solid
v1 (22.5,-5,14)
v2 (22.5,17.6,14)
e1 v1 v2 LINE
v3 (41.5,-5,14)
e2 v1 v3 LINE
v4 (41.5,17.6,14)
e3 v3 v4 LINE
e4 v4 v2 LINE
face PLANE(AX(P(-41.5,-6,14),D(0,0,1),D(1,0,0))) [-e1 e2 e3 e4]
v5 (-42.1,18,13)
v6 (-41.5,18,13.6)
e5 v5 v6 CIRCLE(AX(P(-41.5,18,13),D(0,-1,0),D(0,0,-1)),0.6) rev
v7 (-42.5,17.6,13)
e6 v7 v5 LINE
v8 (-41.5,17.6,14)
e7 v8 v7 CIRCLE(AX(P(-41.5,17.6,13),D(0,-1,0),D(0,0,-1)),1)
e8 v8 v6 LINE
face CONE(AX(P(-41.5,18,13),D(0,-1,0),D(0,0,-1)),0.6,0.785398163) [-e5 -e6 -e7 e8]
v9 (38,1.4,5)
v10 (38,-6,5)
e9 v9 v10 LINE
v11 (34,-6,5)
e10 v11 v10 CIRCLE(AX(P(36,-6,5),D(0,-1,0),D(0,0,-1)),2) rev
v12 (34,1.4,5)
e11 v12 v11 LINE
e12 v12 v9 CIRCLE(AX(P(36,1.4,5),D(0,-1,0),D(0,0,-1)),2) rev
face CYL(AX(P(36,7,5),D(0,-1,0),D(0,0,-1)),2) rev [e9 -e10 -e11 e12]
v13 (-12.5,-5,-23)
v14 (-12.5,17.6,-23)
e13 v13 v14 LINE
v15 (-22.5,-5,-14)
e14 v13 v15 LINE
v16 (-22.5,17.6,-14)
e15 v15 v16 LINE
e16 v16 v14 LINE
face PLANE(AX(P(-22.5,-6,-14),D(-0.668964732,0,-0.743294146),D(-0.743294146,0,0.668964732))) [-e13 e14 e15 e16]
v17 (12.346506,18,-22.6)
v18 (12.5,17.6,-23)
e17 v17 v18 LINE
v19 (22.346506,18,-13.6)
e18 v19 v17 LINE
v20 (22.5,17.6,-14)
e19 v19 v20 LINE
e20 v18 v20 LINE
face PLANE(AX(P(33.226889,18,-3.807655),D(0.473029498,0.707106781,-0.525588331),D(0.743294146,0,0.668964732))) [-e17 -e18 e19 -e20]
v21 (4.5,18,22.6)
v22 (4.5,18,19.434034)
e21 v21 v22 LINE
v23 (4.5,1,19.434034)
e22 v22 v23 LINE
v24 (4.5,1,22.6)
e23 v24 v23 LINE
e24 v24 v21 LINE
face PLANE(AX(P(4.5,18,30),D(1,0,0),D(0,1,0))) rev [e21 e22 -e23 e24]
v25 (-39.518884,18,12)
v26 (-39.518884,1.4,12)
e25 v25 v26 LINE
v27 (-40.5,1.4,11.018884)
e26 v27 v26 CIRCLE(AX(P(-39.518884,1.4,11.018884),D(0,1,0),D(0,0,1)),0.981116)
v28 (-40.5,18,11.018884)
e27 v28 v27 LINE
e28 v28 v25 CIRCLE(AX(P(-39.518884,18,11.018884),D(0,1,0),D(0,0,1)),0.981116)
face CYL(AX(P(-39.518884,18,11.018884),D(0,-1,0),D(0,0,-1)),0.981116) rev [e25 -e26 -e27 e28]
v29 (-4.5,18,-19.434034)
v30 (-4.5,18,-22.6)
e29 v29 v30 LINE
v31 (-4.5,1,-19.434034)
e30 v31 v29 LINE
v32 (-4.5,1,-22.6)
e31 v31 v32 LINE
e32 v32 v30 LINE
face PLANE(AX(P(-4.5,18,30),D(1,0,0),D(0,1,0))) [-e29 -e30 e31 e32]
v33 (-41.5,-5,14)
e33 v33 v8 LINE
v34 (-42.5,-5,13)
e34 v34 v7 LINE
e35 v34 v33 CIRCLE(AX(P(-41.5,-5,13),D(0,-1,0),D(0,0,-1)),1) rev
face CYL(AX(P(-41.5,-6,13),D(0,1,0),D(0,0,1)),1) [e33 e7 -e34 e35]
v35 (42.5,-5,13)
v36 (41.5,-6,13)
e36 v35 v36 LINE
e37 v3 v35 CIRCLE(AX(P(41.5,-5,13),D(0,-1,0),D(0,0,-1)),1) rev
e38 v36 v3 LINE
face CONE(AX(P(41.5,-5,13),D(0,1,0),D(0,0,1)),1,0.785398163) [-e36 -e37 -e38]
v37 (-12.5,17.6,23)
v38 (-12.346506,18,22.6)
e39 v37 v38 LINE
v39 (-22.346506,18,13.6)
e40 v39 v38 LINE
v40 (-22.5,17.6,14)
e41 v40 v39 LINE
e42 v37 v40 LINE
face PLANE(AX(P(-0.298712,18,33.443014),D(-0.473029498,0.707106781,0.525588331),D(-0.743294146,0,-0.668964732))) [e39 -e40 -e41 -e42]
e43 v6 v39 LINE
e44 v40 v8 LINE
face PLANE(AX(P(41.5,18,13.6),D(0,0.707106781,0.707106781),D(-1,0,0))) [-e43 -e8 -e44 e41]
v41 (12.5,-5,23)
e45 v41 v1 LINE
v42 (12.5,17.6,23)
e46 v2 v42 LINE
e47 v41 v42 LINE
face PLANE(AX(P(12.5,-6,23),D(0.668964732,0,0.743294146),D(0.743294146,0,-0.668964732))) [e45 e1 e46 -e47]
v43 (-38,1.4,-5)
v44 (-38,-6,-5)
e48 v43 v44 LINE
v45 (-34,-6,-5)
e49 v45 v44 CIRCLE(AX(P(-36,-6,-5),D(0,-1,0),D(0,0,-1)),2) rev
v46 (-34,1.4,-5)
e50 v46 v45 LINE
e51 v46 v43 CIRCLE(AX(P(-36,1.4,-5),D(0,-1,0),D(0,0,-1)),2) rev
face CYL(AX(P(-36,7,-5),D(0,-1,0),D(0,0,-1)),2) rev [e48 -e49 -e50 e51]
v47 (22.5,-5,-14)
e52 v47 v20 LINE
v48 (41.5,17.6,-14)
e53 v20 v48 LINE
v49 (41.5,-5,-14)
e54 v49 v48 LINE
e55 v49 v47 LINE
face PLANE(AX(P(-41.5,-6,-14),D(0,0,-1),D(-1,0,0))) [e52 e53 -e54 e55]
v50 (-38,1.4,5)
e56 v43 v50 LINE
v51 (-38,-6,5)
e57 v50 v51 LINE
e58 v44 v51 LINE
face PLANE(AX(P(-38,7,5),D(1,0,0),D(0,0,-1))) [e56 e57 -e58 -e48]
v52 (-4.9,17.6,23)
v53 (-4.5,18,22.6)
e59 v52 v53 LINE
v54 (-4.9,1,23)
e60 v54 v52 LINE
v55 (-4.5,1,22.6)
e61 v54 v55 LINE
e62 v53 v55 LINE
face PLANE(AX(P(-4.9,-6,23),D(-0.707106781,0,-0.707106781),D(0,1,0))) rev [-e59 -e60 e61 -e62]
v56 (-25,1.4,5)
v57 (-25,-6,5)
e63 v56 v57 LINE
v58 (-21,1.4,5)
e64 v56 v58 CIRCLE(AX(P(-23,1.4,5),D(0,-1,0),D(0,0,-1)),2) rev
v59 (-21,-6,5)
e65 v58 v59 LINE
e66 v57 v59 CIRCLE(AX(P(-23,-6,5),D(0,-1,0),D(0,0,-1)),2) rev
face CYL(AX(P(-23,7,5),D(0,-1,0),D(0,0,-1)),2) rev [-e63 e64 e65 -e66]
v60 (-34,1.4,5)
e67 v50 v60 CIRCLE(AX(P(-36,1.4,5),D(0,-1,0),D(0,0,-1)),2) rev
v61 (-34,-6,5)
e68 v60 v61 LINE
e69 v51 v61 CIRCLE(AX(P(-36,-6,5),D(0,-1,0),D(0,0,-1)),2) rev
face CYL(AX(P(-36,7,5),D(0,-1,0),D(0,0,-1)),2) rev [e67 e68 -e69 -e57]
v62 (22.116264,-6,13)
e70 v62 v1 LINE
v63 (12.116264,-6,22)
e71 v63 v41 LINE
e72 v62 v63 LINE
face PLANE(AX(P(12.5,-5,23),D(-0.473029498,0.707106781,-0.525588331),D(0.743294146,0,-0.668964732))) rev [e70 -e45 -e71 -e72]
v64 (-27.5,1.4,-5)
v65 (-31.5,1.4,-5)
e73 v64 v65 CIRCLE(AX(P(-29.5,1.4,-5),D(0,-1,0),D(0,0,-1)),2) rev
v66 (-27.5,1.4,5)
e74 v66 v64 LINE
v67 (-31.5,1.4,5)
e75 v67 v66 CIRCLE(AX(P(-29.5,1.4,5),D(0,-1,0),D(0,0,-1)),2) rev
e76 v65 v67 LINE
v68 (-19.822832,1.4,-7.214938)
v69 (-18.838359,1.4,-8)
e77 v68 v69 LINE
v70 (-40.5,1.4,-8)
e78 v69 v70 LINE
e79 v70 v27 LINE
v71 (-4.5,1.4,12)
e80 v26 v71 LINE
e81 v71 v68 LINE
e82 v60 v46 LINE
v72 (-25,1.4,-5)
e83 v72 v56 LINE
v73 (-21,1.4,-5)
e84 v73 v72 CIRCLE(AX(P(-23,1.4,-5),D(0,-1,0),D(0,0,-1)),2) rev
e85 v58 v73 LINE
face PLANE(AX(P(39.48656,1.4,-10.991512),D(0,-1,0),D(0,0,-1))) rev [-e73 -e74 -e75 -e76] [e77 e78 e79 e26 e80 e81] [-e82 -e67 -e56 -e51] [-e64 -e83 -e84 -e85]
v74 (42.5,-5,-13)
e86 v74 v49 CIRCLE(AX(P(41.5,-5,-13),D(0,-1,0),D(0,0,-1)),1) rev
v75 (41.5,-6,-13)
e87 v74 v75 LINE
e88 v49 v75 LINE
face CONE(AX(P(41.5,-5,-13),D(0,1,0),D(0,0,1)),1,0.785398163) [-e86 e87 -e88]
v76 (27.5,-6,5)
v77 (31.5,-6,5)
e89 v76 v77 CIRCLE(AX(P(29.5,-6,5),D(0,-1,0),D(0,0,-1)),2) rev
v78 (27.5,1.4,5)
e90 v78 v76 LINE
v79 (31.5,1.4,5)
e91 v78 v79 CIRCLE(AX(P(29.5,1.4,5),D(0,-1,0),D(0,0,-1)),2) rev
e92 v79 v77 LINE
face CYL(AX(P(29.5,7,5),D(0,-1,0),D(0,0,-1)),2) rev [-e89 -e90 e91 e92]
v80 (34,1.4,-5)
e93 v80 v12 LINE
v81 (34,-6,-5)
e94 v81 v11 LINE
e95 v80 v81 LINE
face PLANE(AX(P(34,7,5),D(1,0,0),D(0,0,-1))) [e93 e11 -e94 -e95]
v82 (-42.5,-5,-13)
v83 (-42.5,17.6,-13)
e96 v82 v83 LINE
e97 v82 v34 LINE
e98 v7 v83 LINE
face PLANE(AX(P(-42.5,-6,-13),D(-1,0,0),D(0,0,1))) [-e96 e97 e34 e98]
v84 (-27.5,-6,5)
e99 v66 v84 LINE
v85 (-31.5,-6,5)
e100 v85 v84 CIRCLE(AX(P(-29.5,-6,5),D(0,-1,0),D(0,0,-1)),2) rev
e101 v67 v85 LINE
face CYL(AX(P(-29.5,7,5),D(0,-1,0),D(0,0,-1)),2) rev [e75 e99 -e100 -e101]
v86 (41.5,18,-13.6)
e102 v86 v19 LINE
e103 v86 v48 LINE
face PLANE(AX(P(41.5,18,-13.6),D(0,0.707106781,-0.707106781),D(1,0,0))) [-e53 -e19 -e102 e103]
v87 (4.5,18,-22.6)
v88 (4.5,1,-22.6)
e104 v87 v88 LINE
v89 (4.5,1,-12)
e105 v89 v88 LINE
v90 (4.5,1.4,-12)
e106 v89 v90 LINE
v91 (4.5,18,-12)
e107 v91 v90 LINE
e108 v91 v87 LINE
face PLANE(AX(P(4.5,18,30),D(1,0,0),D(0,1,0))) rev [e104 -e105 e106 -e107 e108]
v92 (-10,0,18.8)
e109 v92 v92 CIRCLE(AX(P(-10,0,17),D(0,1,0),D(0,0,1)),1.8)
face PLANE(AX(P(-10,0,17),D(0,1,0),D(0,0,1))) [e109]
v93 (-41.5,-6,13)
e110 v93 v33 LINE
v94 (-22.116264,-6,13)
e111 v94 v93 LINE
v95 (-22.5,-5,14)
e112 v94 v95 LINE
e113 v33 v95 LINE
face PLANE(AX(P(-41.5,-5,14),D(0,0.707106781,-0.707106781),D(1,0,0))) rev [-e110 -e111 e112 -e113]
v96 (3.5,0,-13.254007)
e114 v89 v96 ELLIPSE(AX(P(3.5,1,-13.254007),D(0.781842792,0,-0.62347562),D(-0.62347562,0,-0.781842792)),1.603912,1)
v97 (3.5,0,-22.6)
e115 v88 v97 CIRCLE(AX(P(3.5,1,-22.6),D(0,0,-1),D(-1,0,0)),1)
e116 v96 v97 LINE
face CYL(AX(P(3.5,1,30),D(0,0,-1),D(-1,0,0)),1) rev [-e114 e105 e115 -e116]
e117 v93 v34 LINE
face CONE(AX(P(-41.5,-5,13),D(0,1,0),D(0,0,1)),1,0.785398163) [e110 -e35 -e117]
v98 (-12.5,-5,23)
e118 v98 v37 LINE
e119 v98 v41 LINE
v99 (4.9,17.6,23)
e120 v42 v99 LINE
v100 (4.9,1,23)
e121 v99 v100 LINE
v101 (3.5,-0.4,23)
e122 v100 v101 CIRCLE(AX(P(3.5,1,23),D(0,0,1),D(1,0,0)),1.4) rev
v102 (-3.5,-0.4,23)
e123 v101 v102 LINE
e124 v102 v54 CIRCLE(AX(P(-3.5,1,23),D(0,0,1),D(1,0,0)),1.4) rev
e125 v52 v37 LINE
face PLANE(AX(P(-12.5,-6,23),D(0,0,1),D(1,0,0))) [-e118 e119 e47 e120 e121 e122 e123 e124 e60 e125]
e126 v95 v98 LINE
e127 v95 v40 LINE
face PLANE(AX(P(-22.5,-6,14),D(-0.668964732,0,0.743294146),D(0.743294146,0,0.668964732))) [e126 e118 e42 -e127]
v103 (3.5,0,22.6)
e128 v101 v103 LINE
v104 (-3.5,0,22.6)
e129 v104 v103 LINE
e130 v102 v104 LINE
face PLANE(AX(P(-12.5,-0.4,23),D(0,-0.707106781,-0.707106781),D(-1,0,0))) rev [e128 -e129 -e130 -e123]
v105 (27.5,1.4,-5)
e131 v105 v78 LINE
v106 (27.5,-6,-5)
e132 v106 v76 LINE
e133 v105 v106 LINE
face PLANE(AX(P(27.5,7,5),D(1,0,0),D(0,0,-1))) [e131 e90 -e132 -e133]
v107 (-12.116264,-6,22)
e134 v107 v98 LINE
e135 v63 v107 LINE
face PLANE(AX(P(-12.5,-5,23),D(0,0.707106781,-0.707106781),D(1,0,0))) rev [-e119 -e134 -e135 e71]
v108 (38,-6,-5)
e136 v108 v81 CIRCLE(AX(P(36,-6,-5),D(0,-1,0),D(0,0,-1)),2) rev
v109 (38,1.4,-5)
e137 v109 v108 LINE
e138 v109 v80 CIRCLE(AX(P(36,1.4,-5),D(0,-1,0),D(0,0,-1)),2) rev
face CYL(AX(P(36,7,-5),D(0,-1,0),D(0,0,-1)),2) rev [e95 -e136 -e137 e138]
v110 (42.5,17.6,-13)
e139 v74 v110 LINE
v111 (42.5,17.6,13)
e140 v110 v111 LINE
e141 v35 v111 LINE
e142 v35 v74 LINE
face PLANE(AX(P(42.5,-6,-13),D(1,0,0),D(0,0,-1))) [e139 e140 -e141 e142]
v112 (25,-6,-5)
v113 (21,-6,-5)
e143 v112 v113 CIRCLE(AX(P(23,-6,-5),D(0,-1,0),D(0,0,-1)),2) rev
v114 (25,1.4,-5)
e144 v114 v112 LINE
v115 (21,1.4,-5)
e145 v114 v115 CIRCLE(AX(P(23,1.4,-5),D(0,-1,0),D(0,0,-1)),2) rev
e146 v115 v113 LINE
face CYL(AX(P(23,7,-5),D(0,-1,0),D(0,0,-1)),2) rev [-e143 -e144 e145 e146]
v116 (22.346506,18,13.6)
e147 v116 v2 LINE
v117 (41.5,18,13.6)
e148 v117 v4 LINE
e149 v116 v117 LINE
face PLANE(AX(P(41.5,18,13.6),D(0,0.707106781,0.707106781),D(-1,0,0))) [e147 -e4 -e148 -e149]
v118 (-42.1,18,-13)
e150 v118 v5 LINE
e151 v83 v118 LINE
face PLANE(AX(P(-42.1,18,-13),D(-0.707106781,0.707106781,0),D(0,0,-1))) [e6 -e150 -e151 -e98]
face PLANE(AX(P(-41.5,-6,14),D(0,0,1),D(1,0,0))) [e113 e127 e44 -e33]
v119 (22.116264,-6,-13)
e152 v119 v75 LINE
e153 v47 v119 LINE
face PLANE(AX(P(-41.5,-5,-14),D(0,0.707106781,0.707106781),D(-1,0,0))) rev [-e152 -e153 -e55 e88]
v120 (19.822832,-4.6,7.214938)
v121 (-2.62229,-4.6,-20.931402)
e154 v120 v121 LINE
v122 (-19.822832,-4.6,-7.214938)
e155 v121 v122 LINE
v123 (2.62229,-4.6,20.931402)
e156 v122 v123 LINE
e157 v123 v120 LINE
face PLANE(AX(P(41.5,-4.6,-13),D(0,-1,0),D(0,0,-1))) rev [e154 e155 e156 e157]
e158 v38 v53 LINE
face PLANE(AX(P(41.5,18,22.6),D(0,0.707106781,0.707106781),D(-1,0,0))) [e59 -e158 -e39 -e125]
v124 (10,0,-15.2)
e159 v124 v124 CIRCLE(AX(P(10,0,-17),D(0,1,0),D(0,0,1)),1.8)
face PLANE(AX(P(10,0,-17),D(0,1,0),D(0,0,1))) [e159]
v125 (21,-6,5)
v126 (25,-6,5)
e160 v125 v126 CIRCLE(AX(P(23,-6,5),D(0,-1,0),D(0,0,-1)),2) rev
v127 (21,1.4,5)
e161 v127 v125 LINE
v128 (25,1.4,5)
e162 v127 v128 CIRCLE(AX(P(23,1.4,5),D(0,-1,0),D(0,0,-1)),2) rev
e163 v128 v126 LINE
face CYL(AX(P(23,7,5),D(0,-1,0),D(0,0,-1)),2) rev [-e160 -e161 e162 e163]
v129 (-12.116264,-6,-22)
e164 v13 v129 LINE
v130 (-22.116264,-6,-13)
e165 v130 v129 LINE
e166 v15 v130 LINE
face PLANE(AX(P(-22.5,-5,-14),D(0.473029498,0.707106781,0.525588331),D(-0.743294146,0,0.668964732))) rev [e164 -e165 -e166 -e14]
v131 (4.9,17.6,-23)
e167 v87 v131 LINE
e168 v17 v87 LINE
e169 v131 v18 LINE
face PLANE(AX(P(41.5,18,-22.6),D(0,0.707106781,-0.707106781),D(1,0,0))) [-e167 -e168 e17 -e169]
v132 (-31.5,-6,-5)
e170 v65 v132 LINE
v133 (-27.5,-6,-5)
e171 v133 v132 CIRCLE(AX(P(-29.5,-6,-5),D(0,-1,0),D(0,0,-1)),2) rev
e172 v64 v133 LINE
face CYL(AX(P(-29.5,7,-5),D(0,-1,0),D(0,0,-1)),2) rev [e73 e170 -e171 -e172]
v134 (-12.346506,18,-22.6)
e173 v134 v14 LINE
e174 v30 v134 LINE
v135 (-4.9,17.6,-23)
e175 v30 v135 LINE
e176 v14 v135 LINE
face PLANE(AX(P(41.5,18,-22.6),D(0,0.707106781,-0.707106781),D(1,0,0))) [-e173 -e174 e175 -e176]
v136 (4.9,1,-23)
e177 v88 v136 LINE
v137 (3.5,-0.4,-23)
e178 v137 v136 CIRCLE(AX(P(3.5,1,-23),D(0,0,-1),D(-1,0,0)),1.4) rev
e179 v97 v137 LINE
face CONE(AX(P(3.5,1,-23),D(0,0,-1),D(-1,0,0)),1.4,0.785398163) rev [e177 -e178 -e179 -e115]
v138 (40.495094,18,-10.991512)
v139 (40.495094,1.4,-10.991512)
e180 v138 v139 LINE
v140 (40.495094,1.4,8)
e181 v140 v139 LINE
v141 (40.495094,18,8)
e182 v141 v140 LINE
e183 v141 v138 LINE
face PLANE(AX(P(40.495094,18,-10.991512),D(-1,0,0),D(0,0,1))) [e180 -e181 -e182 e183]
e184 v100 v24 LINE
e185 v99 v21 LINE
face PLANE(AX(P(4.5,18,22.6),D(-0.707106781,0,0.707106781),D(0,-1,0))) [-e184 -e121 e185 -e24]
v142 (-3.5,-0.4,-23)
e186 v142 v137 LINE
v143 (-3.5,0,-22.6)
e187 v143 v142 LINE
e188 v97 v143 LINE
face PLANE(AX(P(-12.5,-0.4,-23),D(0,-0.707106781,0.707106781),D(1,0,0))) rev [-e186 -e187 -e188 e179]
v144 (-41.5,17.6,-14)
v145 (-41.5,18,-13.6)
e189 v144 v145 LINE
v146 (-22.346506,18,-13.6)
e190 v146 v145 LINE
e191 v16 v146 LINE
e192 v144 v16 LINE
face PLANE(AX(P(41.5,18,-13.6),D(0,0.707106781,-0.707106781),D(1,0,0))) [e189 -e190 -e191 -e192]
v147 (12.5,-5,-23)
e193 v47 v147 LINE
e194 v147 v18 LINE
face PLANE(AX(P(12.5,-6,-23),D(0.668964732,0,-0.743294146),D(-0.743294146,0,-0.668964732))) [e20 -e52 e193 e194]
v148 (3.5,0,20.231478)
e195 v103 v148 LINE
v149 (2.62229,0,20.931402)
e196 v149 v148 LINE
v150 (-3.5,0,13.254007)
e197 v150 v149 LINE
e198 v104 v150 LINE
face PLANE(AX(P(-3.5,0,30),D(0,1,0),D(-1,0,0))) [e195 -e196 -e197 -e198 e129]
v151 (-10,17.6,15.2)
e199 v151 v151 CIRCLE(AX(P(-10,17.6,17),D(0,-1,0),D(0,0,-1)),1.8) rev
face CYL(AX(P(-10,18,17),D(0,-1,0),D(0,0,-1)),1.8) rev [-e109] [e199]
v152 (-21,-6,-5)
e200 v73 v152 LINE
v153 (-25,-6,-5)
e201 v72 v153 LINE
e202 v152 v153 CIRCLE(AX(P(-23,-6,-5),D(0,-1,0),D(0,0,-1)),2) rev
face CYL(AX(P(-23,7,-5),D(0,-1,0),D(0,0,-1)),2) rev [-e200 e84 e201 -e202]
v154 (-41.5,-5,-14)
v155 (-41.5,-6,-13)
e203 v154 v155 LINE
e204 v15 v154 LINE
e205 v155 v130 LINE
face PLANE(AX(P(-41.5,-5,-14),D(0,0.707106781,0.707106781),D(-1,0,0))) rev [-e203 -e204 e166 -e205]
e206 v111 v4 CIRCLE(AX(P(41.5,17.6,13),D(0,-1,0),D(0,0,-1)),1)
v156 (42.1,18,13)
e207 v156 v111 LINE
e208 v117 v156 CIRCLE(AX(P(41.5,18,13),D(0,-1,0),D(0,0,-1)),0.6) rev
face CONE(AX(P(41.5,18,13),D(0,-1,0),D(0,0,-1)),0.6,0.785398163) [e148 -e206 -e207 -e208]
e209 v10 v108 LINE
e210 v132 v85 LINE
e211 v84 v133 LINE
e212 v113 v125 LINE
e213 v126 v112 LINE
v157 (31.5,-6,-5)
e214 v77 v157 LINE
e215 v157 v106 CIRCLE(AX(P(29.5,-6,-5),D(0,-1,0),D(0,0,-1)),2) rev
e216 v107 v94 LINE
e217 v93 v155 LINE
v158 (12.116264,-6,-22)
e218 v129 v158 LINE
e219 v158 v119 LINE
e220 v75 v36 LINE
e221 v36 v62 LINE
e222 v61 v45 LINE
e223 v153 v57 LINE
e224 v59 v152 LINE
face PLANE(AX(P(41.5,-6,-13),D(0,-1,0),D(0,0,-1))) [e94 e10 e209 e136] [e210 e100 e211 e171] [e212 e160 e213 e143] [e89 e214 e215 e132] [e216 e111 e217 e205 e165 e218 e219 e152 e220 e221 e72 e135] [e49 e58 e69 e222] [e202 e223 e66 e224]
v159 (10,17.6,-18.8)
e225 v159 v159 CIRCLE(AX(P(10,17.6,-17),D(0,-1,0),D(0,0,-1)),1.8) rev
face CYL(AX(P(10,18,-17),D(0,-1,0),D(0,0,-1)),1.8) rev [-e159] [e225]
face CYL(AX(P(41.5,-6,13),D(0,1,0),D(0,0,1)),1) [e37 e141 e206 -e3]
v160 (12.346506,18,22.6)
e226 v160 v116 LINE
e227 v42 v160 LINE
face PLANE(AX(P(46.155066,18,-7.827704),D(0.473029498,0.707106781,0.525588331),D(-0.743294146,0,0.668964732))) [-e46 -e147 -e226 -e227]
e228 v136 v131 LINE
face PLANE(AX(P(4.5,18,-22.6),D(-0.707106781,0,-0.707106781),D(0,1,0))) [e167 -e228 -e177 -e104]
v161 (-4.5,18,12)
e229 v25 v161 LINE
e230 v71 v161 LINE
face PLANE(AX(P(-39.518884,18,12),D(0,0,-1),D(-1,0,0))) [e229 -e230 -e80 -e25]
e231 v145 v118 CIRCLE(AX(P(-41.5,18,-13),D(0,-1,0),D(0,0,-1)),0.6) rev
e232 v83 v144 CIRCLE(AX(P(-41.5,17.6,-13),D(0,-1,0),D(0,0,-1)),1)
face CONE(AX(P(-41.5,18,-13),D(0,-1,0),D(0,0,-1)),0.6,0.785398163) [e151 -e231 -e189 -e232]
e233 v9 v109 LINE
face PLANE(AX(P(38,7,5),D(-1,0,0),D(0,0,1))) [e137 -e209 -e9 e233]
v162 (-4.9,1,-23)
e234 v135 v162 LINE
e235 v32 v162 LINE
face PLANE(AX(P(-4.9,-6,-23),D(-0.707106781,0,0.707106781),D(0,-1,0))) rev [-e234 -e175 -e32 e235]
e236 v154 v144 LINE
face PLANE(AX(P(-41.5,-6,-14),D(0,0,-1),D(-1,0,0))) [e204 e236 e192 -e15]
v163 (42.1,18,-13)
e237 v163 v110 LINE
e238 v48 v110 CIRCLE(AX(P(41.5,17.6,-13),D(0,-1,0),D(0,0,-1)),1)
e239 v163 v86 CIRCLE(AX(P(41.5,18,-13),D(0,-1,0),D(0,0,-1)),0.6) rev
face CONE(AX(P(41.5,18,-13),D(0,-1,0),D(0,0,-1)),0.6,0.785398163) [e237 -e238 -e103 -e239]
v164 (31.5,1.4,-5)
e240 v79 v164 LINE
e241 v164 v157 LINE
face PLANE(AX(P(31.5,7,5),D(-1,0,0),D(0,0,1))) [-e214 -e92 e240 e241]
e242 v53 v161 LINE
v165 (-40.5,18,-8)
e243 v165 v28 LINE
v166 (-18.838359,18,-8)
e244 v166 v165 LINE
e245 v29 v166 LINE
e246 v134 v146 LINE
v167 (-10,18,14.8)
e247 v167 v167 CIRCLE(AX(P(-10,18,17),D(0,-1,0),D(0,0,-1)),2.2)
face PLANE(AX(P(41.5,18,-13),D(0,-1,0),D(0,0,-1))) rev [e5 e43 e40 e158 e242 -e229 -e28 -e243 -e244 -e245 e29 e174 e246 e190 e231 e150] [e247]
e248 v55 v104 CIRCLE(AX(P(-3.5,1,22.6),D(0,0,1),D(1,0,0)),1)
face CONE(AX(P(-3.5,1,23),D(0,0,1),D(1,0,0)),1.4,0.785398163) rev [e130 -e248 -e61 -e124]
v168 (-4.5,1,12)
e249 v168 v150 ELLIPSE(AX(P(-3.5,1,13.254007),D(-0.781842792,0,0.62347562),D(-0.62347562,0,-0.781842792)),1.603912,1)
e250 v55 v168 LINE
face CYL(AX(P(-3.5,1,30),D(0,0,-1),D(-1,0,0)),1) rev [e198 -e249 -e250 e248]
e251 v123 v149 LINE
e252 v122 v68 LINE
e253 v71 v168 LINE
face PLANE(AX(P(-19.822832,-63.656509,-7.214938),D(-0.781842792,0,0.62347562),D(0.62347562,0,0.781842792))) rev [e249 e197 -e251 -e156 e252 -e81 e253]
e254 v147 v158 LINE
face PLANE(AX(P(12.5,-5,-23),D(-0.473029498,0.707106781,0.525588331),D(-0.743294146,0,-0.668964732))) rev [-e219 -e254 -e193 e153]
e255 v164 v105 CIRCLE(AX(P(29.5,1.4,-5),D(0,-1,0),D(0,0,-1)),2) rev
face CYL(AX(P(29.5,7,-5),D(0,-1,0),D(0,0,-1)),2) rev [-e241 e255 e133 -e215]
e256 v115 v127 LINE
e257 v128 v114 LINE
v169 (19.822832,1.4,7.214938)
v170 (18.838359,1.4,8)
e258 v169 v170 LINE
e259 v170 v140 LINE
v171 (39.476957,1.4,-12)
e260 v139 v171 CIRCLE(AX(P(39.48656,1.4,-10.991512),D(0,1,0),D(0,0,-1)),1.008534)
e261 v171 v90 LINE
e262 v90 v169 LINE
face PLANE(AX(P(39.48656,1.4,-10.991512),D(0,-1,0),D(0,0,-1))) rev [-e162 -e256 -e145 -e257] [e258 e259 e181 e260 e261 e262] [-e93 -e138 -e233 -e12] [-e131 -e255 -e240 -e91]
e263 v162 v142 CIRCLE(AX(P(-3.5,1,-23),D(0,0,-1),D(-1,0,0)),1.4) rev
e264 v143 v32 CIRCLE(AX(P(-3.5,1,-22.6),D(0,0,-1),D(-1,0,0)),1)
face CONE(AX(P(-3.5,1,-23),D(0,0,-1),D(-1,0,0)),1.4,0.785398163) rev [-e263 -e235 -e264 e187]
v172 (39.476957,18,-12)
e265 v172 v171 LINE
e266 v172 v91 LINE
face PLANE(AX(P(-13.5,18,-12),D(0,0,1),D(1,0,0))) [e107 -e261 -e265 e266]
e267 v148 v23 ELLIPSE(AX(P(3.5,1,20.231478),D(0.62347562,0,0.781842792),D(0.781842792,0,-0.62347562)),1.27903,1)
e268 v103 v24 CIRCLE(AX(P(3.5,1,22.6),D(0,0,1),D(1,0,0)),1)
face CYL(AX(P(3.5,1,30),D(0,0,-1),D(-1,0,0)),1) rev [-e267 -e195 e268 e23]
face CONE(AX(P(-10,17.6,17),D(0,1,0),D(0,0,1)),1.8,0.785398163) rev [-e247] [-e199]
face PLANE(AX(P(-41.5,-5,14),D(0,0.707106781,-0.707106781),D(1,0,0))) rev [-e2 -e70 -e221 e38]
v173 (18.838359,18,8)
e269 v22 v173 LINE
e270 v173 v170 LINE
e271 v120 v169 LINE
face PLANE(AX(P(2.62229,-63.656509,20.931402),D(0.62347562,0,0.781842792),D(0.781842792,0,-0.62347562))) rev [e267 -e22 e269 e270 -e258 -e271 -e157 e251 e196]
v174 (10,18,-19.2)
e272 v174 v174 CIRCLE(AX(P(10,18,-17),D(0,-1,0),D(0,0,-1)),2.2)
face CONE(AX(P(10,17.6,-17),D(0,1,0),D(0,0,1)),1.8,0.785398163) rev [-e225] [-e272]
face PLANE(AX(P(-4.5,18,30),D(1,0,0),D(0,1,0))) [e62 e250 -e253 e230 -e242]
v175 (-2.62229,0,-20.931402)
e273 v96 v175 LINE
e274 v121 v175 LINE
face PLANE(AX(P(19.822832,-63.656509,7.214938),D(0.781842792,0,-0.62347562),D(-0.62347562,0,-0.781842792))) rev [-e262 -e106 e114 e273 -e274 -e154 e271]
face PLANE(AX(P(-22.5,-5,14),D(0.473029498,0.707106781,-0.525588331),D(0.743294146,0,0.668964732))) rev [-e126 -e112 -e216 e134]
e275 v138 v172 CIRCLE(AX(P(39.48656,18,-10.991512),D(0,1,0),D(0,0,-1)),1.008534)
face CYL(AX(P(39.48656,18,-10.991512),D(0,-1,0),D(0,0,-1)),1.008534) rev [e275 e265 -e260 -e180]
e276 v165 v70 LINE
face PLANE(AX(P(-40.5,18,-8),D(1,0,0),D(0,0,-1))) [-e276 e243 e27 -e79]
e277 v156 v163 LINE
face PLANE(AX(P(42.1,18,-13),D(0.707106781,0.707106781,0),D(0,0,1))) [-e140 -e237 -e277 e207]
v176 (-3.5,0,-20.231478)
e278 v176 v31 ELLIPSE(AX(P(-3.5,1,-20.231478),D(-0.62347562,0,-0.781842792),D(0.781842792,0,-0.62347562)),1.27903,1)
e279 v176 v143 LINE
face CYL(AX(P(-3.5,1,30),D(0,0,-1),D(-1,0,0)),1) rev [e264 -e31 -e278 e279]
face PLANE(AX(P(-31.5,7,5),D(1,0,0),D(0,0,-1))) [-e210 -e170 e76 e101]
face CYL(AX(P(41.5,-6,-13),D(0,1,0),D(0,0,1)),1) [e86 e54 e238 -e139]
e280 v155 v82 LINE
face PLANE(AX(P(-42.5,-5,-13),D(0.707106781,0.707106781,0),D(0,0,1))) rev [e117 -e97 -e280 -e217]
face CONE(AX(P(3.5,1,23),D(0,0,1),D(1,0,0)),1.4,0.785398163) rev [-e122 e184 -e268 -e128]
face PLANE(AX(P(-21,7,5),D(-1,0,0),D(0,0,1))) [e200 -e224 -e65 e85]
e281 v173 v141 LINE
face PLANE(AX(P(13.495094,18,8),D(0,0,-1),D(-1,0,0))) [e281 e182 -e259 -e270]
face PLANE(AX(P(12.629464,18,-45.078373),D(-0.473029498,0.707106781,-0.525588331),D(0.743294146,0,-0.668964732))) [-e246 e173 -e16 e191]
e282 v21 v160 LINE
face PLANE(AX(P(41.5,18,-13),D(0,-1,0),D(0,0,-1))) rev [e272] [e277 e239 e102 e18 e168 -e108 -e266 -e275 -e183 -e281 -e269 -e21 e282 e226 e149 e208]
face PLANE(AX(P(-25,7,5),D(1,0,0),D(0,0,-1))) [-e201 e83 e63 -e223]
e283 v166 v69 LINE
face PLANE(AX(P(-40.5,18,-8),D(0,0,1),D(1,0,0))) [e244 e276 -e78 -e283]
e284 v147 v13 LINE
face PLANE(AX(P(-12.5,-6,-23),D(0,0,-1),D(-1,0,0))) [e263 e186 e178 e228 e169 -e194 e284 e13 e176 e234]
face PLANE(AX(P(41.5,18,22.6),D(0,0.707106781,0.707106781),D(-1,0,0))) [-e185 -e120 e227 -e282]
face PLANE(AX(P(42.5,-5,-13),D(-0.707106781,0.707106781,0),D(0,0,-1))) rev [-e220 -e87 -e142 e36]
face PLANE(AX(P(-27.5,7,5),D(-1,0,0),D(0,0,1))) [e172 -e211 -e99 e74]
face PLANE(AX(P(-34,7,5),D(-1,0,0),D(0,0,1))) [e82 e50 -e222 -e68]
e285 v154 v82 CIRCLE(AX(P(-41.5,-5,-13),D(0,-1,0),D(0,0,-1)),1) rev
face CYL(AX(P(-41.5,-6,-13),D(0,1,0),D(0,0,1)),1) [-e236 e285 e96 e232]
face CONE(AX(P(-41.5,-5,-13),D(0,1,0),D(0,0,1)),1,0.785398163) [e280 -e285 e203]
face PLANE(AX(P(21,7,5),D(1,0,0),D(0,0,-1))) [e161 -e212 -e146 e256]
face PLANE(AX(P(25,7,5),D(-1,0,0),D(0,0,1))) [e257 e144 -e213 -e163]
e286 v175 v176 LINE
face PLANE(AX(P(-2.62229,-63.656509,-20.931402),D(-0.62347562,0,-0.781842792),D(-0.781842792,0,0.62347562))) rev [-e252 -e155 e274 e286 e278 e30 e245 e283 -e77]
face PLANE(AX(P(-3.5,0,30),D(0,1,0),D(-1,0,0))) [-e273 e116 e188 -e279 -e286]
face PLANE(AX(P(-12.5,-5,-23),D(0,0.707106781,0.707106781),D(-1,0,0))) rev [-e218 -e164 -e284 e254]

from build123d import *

# Parameters (mm, degrees)
BOSS_EXTRUDE2_DEPTH           = 18
BOSS_EXTRUDE2_DEPTH_BACK      = 6
BOSS_EXTRUDE3_DEPTH           = 18
BOSS_EXTRUDE3_DEPTH_BACK      = 6
LOAD_BAR_ARM_SLOTS_DEPTH      = 30
LOAD_BAR_ARM_SLOTS_DEPTH_BACK = 30
F_10KG_START                  = 1.4
F_10KG_TAL_BAR_SLOT_DEPTH     = 16.6
HX711_CHIP_HOLSTER_DEPTH      = 18
HX711_CHIP_HOLSTER_DEPTH_BACK = 4.6
SKETCH6_R                     = 1.8
SCREW_HOLE_DEPTH              = 18
CHAMFER3_SIZE                 = 0.4
CHAMFER8_SIZE                 = 1
CUT_EXTRUDE6_DEPTH            = 7
CUT_EXTRUDE6_DEPTH_BACK       = 7


with BuildPart() as part:
    # Sketch1 → Boss-Extrude2 (new, two sides: drawn at the far end of the back side and taken through both)
    with BuildSketch(Plane(origin=(0, 0, 0), x_dir=(1, 0, 0), z_dir=(0, 1, 0)).offset(-BOSS_EXTRUDE2_DEPTH_BACK)):
        with BuildLine():
            Line((-41.5, 14), (41.5, 14))
            ThreePointArc((41.5, 14), (42.207106781, 13.707106781), (42.5, 13))
            Line((42.5, 13), (42.5, -13))
            ThreePointArc((42.5, -13), (42.207106781, -13.707106781), (41.5, -14))
            Line((41.5, -14), (-41.5, -14))
            ThreePointArc((-41.5, -14), (-42.207106781, -13.707106781), (-42.5, -13))
            Line((-42.5, -13), (-42.5, 13))
            ThreePointArc((-42.5, 13), (-42.207106781, 13.707106781), (-41.5, 14))
        make_face()
    extrude(amount=BOSS_EXTRUDE2_DEPTH + BOSS_EXTRUDE2_DEPTH_BACK)

    # Sketch4 → Boss-Extrude3 (add, two sides: drawn at the far end of the back side and taken through both)
    with BuildSketch(Plane(origin=(0, 0, 0), x_dir=(1, 0, 0), z_dir=(0, 1, 0)).offset(-BOSS_EXTRUDE3_DEPTH_BACK)):
        Polygon((-12.5, 23), (12.5, 23), (22.5, 14), (22.5, -14), (12.5, -23), (-12.5, -23), (-22.5, -14), (-22.5, 14), align=None)
    extrude(amount=BOSS_EXTRUDE3_DEPTH + BOSS_EXTRUDE3_DEPTH_BACK)

    # Sketch2 → load bar arm slots (cut, two sides: drawn at the far end of the back side and taken through both)
    with BuildSketch(Plane.XY.offset(-LOAD_BAR_ARM_SLOTS_DEPTH_BACK)):
        with BuildLine():
            Line((-3.5, 19), (3.5, 19))
            ThreePointArc((3.5, 19), (4.207106781, 18.707106781), (4.5, 18))
            Line((4.5, 18), (4.5, 1))
            ThreePointArc((4.5, 1), (4.207106781, 0.292893219), (3.5, 0))
            Line((3.5, 0), (-3.5, 0))
            ThreePointArc((-3.5, 0), (-4.207106781, 0.292893219), (-4.5, 1))
            Line((-4.5, 1), (-4.5, 18))
            ThreePointArc((-4.5, 18), (-4.207106781, 18.707106781), (-3.5, 19))
        make_face()
    extrude(amount=LOAD_BAR_ARM_SLOTS_DEPTH + LOAD_BAR_ARM_SLOTS_DEPTH_BACK, mode=Mode.SUBTRACT)

    # Sketch5 → 10kg TAL bar slot (cut)
    with BuildSketch(Plane(origin=(0, 0, 0), x_dir=(1, 0, 0), z_dir=(0, 1, 0)).offset(F_10KG_START)):
        with BuildLine():
            Line((-40.5, 8), (-40.5, -11.01888353))
            ThreePointArc((-40.5, -11.01888353), (-40.212637639, -11.712637639), (-39.51888353, -12))
            Line((-39.51888353, -12), (13.495093721, -12))
            Line((13.495093721, -12), (13.495093721, -8))
            Line((13.495093721, -8), (40.495093721, -8))
            Line((40.495093721, -8), (40.495093721, 10.991511742))
            ThreePointArc((40.495093721, 10.991511742), (40.196297826, 11.708039924), (39.4769572, 12))
            Line((39.4769572, 12), (-13.5, 12))
            Line((-13.5, 12), (-13.5, 8))
            Line((-13.5, 8), (-40.5, 8))
        make_face()
    extrude(amount=F_10KG_TAL_BAR_SLOT_DEPTH, mode=Mode.SUBTRACT)

    # Sketch3 → hx711 chip holster (cut, two sides: drawn at the far end of the back side and taken through both)
    with BuildSketch(Plane(origin=(0, 0, 0), x_dir=(1, 0, 0), z_dir=(0, 1, 0)).offset(-HX711_CHIP_HOLSTER_DEPTH_BACK)):
        Polygon((-2.622290437, 20.931402076), (-19.822831867, 7.214938445), (2.622290437, -20.931402076), (19.822831867, -7.214938445), align=None)
    extrude(amount=HX711_CHIP_HOLSTER_DEPTH + HX711_CHIP_HOLSTER_DEPTH_BACK, mode=Mode.SUBTRACT)

    # Sketch6 → screw hole (cut)
    with BuildSketch(Plane(origin=(0, 0, 0), x_dir=(1, 0, 0), z_dir=(0, 1, 0))):
        with Locations(Location((-10, -17, 0), (0, 0, 270))):
            Circle(SKETCH6_R)
        with Locations(Location((10, 17, 0), (0, 0, 270))):
            Circle(SKETCH6_R)
    extrude(amount=SCREW_HOLE_DEPTH, mode=Mode.SUBTRACT)

    # Chamfer3
    chamfer3_edges = [part.edges().sort_by_distance(p)[0] for p in [
        (-10, 18, 15.2),
        (10, 18, -18.8),
        (42.207106781, 18, -13.707106781),
        (32, 18, -14),
        (-42.207106781, 18, -13.707106781),
        (-42.5, 18, 0),
        (-42.207106781, 18, 13.707106781),
        (-32, 18, 14),
        (42.207106781, 18, 13.707106781),
        (42.5, 18, 0),
        (-32, 18, -14),
        (32, 18, 14),
        (-17.5, 18, 18.5),
        (-8.5, 18, 23),
        (17.5, 18, 18.5),
        (17.5, 18, -18.5),
        (8.5, 18, -23),
        (-17.5, 18, -18.5),
        (8.5, 18, 23),
        (4.5, 9.5, 23),
        (4.207106781, 0.292893219, 23),
        (0, 0, 23),
        (-4.207106781, 0.292893219, 23),
        (-4.5, 9.5, 23),
        (-8.5, 18, -23),
        (4.5, 9.5, -23),
        (-4.5, 9.5, -23),
        (-4.207106781, 0.292893219, -23),
        (0, 0, -23),
        (4.207106781, 0.292893219, -23),
    ]]
    chamfer(chamfer3_edges, length=CHAMFER3_SIZE)

    # Chamfer8
    chamfer8_edges = [part.edges().sort_by_distance(p)[0] for p in [
        (-42.207106781, -6, -13.707106781),
        (-42.5, -6, 0),
        (-42.207106781, -6, 13.707106781),
        (-32, -6, 14),
        (42.207106781, -6, 13.707106781),
        (42.5, -6, 0),
        (32, -6, 14),
        (-32, -6, -14),
        (-17.5, -6, -18.5),
        (0, -6, -23),
        (17.5, -6, -18.5),
        (42.207106781, -6, -13.707106781),
        (17.5, -6, 18.5),
        (0, -6, 23),
        (-17.5, -6, 18.5),
        (32, -6, -14),
    ]]
    chamfer(chamfer8_edges, length=CHAMFER8_SIZE - 0.0001)  # a hair under: the kernel refuses the full size

    # Sketch10 → Cut-Extrude6 (cut, two sides: drawn at the far end of the back side and taken through both)
    with BuildSketch(Plane(origin=(0, 0, 0), x_dir=(1, 0, 0), z_dir=(0, 1, 0)).offset(-CUT_EXTRUDE6_DEPTH_BACK)):
        with BuildLine():
            Line((-38, -5), (-38, 5))
            ThreePointArc((-38, 5), (-36, 7), (-34, 5))
            Line((-34, 5), (-34, -5))
            ThreePointArc((-34, -5), (-36, -7), (-38, -5))
        make_face()
        with BuildLine():
            Line((-31.5, -5), (-31.5, 5))
            ThreePointArc((-31.5, 5), (-29.5, 7), (-27.5, 5))
            Line((-27.5, 5), (-27.5, -5))
            ThreePointArc((-27.5, -5), (-29.5, -7), (-31.5, -5))
        make_face()
        with BuildLine():
            Line((-25, -5), (-25, 5))
            ThreePointArc((-25, 5), (-23, 7), (-21, 5))
            Line((-21, 5), (-21, -5))
            ThreePointArc((-21, -5), (-23, -7), (-25, -5))
        make_face()
        with BuildLine():
            Line((21, -5), (21, 5))
            ThreePointArc((21, 5), (23, 7), (25, 5))
            Line((25, 5), (25, -5))
            ThreePointArc((25, -5), (23, -7), (21, -5))
        make_face()
        with BuildLine():
            Line((27.5, -5), (27.5, 5))
            ThreePointArc((27.5, 5), (29.5, 7), (31.5, 5))
            Line((31.5, 5), (31.5, -5))
            ThreePointArc((31.5, -5), (29.5, -7), (27.5, -5))
        make_face()
        with BuildLine():
            Line((34, -5), (34, 5))
            ThreePointArc((34, 5), (36, 7), (38, 5))
            Line((38, 5), (38, -5))
            ThreePointArc((38, -5), (36, -7), (34, -5))
        make_face()
    extrude(amount=CUT_EXTRUDE6_DEPTH + CUT_EXTRUDE6_DEPTH_BACK, mode=Mode.SUBTRACT)


solid = part.part
